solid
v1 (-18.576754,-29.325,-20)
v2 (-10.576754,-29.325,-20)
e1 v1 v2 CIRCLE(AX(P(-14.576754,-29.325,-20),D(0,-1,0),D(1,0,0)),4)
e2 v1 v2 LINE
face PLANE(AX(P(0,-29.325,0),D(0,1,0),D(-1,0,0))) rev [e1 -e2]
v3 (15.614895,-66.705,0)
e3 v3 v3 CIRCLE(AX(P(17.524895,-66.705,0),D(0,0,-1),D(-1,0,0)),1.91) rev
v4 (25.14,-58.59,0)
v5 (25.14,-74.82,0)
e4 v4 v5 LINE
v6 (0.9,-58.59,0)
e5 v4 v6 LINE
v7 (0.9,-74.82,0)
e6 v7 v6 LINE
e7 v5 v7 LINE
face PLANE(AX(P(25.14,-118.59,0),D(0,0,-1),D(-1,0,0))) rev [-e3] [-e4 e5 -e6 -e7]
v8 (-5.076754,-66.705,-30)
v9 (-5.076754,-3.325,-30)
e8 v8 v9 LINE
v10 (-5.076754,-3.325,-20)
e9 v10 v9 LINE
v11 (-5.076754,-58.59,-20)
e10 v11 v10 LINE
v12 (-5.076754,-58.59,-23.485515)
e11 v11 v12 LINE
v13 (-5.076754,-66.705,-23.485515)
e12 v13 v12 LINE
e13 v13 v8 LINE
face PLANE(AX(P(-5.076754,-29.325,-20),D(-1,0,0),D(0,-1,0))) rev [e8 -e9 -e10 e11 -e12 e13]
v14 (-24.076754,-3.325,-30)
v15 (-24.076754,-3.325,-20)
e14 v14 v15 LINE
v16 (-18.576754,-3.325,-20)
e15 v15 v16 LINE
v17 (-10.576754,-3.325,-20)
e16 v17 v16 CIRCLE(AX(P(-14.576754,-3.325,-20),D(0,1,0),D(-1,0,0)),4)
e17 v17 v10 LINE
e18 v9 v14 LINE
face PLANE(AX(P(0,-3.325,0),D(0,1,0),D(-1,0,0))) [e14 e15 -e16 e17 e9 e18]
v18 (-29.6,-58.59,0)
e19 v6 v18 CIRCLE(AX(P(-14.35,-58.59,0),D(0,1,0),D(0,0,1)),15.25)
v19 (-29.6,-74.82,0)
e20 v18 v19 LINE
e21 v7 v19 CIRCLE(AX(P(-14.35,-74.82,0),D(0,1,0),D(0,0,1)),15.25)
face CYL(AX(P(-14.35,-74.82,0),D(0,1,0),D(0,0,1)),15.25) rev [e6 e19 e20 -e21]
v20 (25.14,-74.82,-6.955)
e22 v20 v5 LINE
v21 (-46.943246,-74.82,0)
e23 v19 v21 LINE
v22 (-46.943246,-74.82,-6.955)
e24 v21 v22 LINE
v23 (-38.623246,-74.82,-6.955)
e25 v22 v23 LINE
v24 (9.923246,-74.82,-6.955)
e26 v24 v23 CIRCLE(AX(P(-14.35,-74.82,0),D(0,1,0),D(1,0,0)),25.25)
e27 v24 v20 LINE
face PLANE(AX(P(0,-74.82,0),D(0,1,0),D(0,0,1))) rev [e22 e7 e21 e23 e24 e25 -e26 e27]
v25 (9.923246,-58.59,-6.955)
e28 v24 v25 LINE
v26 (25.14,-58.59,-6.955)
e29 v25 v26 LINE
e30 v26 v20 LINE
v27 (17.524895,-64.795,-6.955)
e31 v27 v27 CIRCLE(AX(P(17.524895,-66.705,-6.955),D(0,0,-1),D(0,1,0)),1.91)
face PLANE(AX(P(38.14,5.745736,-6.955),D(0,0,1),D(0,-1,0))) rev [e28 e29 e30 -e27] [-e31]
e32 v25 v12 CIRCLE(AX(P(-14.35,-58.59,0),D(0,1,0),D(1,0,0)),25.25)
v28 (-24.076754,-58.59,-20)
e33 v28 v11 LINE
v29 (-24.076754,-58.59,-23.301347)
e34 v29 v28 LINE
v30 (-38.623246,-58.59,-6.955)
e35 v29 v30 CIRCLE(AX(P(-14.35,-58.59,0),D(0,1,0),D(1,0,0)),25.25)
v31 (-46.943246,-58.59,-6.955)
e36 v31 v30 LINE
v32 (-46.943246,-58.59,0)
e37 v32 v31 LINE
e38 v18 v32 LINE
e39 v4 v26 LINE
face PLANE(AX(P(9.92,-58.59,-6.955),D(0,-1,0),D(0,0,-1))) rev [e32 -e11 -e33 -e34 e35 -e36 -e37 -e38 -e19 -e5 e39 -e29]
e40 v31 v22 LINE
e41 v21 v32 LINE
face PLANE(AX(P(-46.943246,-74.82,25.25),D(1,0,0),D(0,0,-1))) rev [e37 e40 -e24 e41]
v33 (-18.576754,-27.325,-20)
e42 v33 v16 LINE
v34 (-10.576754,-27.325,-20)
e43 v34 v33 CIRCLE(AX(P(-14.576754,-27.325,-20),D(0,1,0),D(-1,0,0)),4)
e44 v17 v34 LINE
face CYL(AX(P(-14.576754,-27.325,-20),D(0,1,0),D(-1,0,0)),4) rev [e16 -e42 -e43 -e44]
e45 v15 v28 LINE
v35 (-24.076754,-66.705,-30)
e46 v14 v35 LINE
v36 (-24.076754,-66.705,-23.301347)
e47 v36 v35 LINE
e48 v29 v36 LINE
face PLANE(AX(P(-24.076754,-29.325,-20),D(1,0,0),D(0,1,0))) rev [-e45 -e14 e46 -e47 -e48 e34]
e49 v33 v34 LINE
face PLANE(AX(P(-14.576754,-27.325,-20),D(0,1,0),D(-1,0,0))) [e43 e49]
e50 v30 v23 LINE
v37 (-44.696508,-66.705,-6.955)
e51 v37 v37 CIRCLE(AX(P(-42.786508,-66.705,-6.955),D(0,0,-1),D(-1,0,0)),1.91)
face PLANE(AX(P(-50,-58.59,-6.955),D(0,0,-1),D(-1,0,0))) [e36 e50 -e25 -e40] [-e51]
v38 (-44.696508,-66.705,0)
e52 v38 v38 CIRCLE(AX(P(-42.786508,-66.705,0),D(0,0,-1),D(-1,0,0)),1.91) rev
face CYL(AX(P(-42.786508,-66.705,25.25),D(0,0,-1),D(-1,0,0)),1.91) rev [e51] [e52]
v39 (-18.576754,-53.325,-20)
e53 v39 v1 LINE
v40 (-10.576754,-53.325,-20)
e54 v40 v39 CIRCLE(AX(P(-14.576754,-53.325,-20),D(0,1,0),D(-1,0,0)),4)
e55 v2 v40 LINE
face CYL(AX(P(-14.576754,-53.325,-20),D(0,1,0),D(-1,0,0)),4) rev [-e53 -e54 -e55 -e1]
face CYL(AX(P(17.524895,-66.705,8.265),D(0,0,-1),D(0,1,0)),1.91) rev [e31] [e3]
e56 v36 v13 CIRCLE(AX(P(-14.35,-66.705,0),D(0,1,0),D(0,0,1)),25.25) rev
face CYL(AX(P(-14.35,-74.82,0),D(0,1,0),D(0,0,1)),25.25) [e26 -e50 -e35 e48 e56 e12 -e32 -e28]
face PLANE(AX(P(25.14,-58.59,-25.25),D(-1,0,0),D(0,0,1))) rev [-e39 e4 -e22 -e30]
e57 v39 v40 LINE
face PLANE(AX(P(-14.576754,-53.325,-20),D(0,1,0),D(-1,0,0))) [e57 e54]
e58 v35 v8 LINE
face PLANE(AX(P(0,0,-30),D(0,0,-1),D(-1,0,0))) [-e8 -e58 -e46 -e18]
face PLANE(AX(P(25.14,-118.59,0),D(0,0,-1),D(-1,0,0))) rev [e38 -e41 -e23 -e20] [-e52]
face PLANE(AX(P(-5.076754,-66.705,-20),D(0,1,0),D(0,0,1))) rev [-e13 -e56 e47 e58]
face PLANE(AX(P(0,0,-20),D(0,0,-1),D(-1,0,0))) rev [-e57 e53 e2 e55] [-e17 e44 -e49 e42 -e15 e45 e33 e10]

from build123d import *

# Parameters (mm, degrees)
SKETCH_1_W                = 50.28
SKETCH_1_H                = 34.2
SKETCH_1_W_2              = 30.28
SKETCH_1_H_2              = 14.2
EXTRUDE_1_DEPTH           = 12.25
SKETCH_4_W                = 13
SKETCH_4_H                = 13.91
EXTRUDE_1_2_DEPTH         = 74.82
SKETCH_5_W                = 13.91
SKETCH_5_H                = 16.23
EXTRUDE_2_DEPTH           = 16
SKETCH_7_R                = 25.25
SKETCH_7_R_2              = 15.25
EXTRUDE_2_2_DEPTH         = 16.23
SKETCH_15_R               = 1.91
CUT_EXTRUDE_6_DEPTH       = 97.964478439
SKETCH_18_W               = 49.344544624
SKETCH_18_H               = 6.125
CUT_EXTRUDE_8_DEPTH       = 101.789238284
SKETCH_19_W               = 34.2
SKETCH_19_H               = 6.125
CUT_EXTRUDE_9_DEPTH       = 10
SKETCH_21_R               = 1.91
CUT_EXTRUDE_10_DEPTH      = 10
SKETCH_20_R               = 1.91
CUT_EXTRUDE_11_DEPTH      = 10
FILLET_START              = -7.1
FILLET_1_DEPTH            = 14.2
FILLET_2_DEPTH            = 14.2
SKETCH_29_W               = 13.91
SKETCH_29_H               = 74.82
EXTRUDE_5_DEPTH           = 10
SKETCH_30_W               = 10
SKETCH_30_H               = 58.59
CUT_EXTRUDE_13_DEPTH      = 97.964478439
SKETCH_32_W               = 34.2
SKETCH_32_H               = 5.745736365
EXTRUDE_6_DEPTH           = 10
CUT_EXTRUDE_16_DEPTH      = 50
CUT_EXTRUDE_16_DEPTH_BACK = 50
SKETCH_38_W               = 116.985630298
SKETCH_38_H               = 80.538350638
SKETCH_41_W               = 13.91
SKETCH_41_H               = 5.745736365
EXTRUDE_7_DEPTH           = 3
SKETCH_42_W               = 13
SKETCH_42_H               = 13.91
EXTRUDE_8_DEPTH           = 74.82
SKETCH_43_W               = 13.91
SKETCH_43_H               = 16.23
EXTRUDE_9_DEPTH           = 15.22
SKETCH_44_R               = 1.91
CUT_EXTRUDE_17_DEPTH      = 15.22
SKETCH_46_R               = 25.25
SKETCH_46_R_2             = 15.25
EXTRUDE_6_2_DEPTH         = 16.23
EXTRUDE_10_DEPTH          = 7.22
EXTRUDE_10_DEPTH_BACK     = 10
SKETCH_47_W               = 13.91
SKETCH_47_H               = 16.23
SKETCH_50_W               = 3.056753925
SKETCH_50_H               = 16.23
CUT_EXTRUDE_18_DEPTH      = 96.578211037
SKETCH_51_R               = 1.91
CUT_EXTRUDE_19_DEPTH      = 95.015226304
CUT_EXTRUDE_21_DEPTH      = 95.015226304
CUT_EXTRUDE_21_DEPTH_BACK = 95.015226304
SKETCH_54_W               = 96.956660426
SKETCH_54_H               = 45.351296872
CUT_EXTRUDE_22_DEPTH      = 60
SKETCH_59_W               = 19
SKETCH_59_H               = 37.38
EXTRUDE_12_DEPTH          = 10
SKETCH_60_R               = 4
CUT_EXTRUDE_25_DEPTH      = 24
SKETCH_61_W               = 19
SKETCH_61_H               = 10
EXTRUDE_13_DEPTH          = 26
SKETCH_62_R               = 4
CUT_EXTRUDE_26_DEPTH      = 24


with BuildPart() as part:
    # 草圖1 → Extrude 1 (new body)
    with BuildSketch(Plane(origin=(0, 0, 0), x_dir=(1, 0, 0), z_dir=(0, 1, 0))):
        Rectangle(SKETCH_1_W, SKETCH_1_H)
        Rectangle(SKETCH_1_W_2, SKETCH_1_H_2, mode=Mode.SUBTRACT)
    extrude(amount=EXTRUDE_1_DEPTH)

    # 草圖4 → Extrude 1 2 (add)
    with BuildSketch(Plane.XZ):
        with Locations((18.64, 0)):
            Rectangle(SKETCH_4_W, SKETCH_4_H)
    extrude(amount=EXTRUDE_1_2_DEPTH)

    # 草圖5 → Extrude 2 (add)
    with BuildSketch(Plane.ZY.offset(-12.14)):
        with Locations((0, -66.705)):
            Rectangle(SKETCH_5_W, SKETCH_5_H)
    extrude(amount=EXTRUDE_2_DEPTH)

    # 草圖7 → Extrude 2 2 (add)
    with BuildSketch(Plane(origin=(3.626674765, -74.82, 0), x_dir=(1, 0, 0), z_dir=(0, -1, 0))):
        with Locations((-30.978154344, 0)):
            Circle(SKETCH_7_R)
        with Locations((-30.978154344, 0)):
            Circle(SKETCH_7_R_2, mode=Mode.SUBTRACT)
    extrude(amount=-EXTRUDE_2_2_DEPTH)

    # 草圖15 → 除料-伸長6 (cut, through all)
    with BuildSketch(Plane(origin=(0, 0, -6.955), x_dir=(-1, 0, 0), z_dir=(0, 0, -1))):
        with Locations((-4.530883248, -66.705)):
            Circle(SKETCH_15_R)
    extrude(amount=-CUT_EXTRUDE_6_DEPTH, mode=Mode.SUBTRACT)

    # 草圖18 → 除料-伸長8 (cut, through all)
    with BuildSketch(Plane(origin=(0, 0, -17.1), x_dir=(-1, 0, 0), z_dir=(0, 0, -1))):
        with Locations((0.467727688, 9.1875)):
            Rectangle(SKETCH_18_W, SKETCH_18_H)
    extrude(amount=-CUT_EXTRUDE_8_DEPTH, mode=Mode.SUBTRACT)

    # 草圖19 → 除料-伸長9 (cut)
    with BuildSketch(Plane.ZY.offset(-24.204544624)):
        with Locations((0, 9.1875)):
            Rectangle(SKETCH_19_W, SKETCH_19_H)
    extrude(amount=-CUT_EXTRUDE_9_DEPTH, mode=Mode.SUBTRACT)

    # 草圖21 → 除料-伸長10 (cut)
    with BuildSketch(Plane(origin=(0, 6.125, 0), x_dir=(1, 0, 0), z_dir=(0, 1, 0))):
        with Locations(Location((17.69, 0, 0), (0, 0, 270))):
            Circle(SKETCH_21_R)
    extrude(amount=-CUT_EXTRUDE_10_DEPTH, mode=Mode.SUBTRACT)

    # 草圖20 → 除料-伸長11 (cut)
    with BuildSketch(Plane(origin=(0, 6.125, 0), x_dir=(1, 0, 0), z_dir=(0, 1, 0))):
        with Locations(Location((-17.395, 0, 0), (0, 0, 270))):
            Circle(SKETCH_20_R)
    extrude(amount=-CUT_EXTRUDE_11_DEPTH, mode=Mode.SUBTRACT)

    # 圓角1: read off the stored shape, not the designer's step
    # 圓角1 outline → 圓角1 (cut)
    with BuildSketch(Plane.XY.offset(FILLET_START)):
        with BuildLine():
            add(Edge.make_bspline(
                [(-15.14, 0), (-21.974170252, 5.199829476), (-25.14, 5.745736365)],
                knots=[0, 0, 0, 0.664102345, 0.664102345, 0.664102345], degree=2, weights=[1, 2.223777218, 1.822127795]))
            Line((-15.14, 0), (-15.14, 6.125))
            Line((-15.14, 6.125), (-25.14, 6.125))
            Line((-25.14, 6.125), (-25.14, 5.745736365))
        make_face()
    extrude(amount=FILLET_1_DEPTH, mode=Mode.SUBTRACT)

    # 圓角2: read off the stored shape, not the designer's step
    # 圓角2 outline → 圓角2 (cut)
    with BuildSketch(Plane.XY.offset(FILLET_START)):
        with BuildLine():
            Line((15.14, 6.125), (15.14, 0))
            add(Edge.make_bspline(
                [(15.14, 0), (21.974170252, 5.199829476), (25.14, 5.745736365)],
                knots=[0, 0, 0, 0.664102345, 0.664102345, 0.664102345], degree=2, weights=[1, 2.223777218, 1.822127795]))
            Line((25.14, 5.745736365), (25.14, 6.125))
            Line((25.14, 6.125), (15.14, 6.125))
        make_face()
    extrude(amount=FILLET_2_DEPTH, mode=Mode.SUBTRACT)

    # 草圖29 → 填料-伸長5 (add)
    with BuildSketch(Plane(origin=(25.14, 0, 0), x_dir=(0, 0, -1), z_dir=(1, 0, 0))):
        with Locations((0, -37.41)):
            Rectangle(SKETCH_29_W, SKETCH_29_H)
    extrude(amount=EXTRUDE_5_DEPTH)

    # 草圖30 → 除料-伸長13 (cut, through all)
    with BuildSketch(Plane.XY.offset(6.955)):
        with Locations((17.14, -29.295)):
            Rectangle(SKETCH_30_W, SKETCH_30_H)
    extrude(amount=-CUT_EXTRUDE_13_DEPTH, mode=Mode.SUBTRACT)

    # 草圖32 → Extrude 6 (add)
    with BuildSketch(Plane(origin=(25.14, 0, 0), x_dir=(0, 0, -1), z_dir=(1, 0, 0))):
        with Locations((0, 2.872868182)):
            Rectangle(SKETCH_32_W, SKETCH_32_H)
    extrude(amount=EXTRUDE_6_DEPTH)

    # 草圖38 → 除料-伸長16 (cut, two sides: drawn at the far end of the back side and taken through both)
    with BuildSketch(Plane(origin=(0, 0, -6.955), x_dir=(-1, 0, 0), z_dir=(0, 0, -1)).offset(-CUT_EXTRUDE_16_DEPTH_BACK)):
        with Locations((7.268869252, -40.269175319)):
            Rectangle(SKETCH_38_W, SKETCH_38_H)
    extrude(amount=CUT_EXTRUDE_16_DEPTH + CUT_EXTRUDE_16_DEPTH_BACK, mode=Mode.SUBTRACT)

    # 草圖41 → 填料-伸長7 (add)
    with BuildSketch(Plane(origin=(35.14, 0, 0), x_dir=(0, 0, -1), z_dir=(1, 0, 0))):
        with Locations((0, 2.872868182)):
            Rectangle(SKETCH_41_W, SKETCH_41_H)
    extrude(amount=EXTRUDE_7_DEPTH)

    # 草圖42 → 填料-伸長8 (add)
    with BuildSketch(Plane(origin=(0, 0, 0), x_dir=(-1, 0, 0), z_dir=(0, -1, 0))):
        with Locations((-31.64, 0)):
            Rectangle(SKETCH_42_W, SKETCH_42_H)
    extrude(amount=EXTRUDE_8_DEPTH)

    # 草圖43 → 填料-伸長9 (add)
    with BuildSketch(Plane.ZY.offset(-25.14)):
        with Locations((0, -66.705)):
            Rectangle(SKETCH_43_W, SKETCH_43_H)
    extrude(amount=EXTRUDE_9_DEPTH)

    # 草圖44 → 除料-伸長17 (cut)
    with BuildSketch(Plane(origin=(0, 0, -6.955), x_dir=(-1, 0, 0), z_dir=(0, 0, -1))):
        with Locations(Location((-17.524895264, -66.705, 0), (0, 0, 90))):
            Circle(SKETCH_44_R)
    extrude(amount=-CUT_EXTRUDE_17_DEPTH, mode=Mode.SUBTRACT)

    # 草圖46 → Extrude 6 2 (add)
    with BuildSketch(Plane(origin=(0, -58.59, 0), x_dir=(1, 0, 0), z_dir=(0, 1, 0))):
        with Locations((-14.35, 0)):
            Circle(SKETCH_46_R)
        with Locations((-14.35, 0)):
            Circle(SKETCH_46_R_2, mode=Mode.SUBTRACT)
    extrude(amount=-EXTRUDE_6_2_DEPTH)

    # 草圖47 → 填料-伸長10 (add, two sides: drawn at the far end of the back side and taken through both)
    with BuildSketch(Plane(origin=(-40, 0, 0), x_dir=(0, 0, -1), z_dir=(1, 0, 0)).offset(-EXTRUDE_10_DEPTH_BACK)):
        with Locations((0, -66.705)):
            Rectangle(SKETCH_47_W, SKETCH_47_H)
    extrude(amount=EXTRUDE_10_DEPTH + EXTRUDE_10_DEPTH_BACK)

    # 草圖50 → 除料-伸長18 (cut, through all)
    with BuildSketch(Plane(origin=(0, 0, -6.955), x_dir=(-1, 0, 0), z_dir=(0, 0, -1))):
        with Locations((48.471623038, -66.705)):
            Rectangle(SKETCH_50_W, SKETCH_50_H)
    extrude(amount=-CUT_EXTRUDE_18_DEPTH, mode=Mode.SUBTRACT)

    # 草圖51 → 除料-伸長19 (cut, through all)
    with BuildSketch(Plane(origin=(0, 0, -6.955), x_dir=(-1, 0, 0), z_dir=(0, 0, -1))):
        with Locations((42.786508152, -66.705)):
            Circle(SKETCH_51_R)
    extrude(amount=-CUT_EXTRUDE_19_DEPTH, mode=Mode.SUBTRACT)

    # 草圖53 → 除料-伸長21 (cut, two sides: drawn at the far end of the back side and taken through both)
    with BuildSketch(Plane.XY.offset(6.955).offset(-CUT_EXTRUDE_21_DEPTH_BACK)):
        Polygon((25.14, -58.59), (25.14, -81.637244924), (42.795360098, -81.637244924), (56.21630317, 11.638309425), (-41.644740061, 8.95412081), (-39.519757408, -16.545671026), (25.14, -20.795636332), align=None)
    extrude(amount=CUT_EXTRUDE_21_DEPTH + CUT_EXTRUDE_21_DEPTH_BACK, mode=Mode.SUBTRACT)

    # 草圖54 → 除料-伸長22 (cut)
    with BuildSketch(Plane(origin=(0, -58.59, 0), x_dir=(1, 0, 0), z_dir=(0, 1, 0))):
        with Locations((-23.338330213, -22.675648436)):
            Rectangle(SKETCH_54_W, SKETCH_54_H)
    extrude(amount=-CUT_EXTRUDE_22_DEPTH, mode=Mode.SUBTRACT)

    # 草圖59 → 填料-伸長12 (add)
    with BuildSketch(Plane.XY.offset(-30)):
        with Locations((-14.576753925, -48.015)):
            Rectangle(SKETCH_59_W, SKETCH_59_H)
    extrude(amount=EXTRUDE_12_DEPTH)

    # 草圖60 → 除料-伸長25 (cut)
    with BuildSketch(Plane(origin=(0, -29.325, 0), x_dir=(1, 0, 0), z_dir=(0, 1, 0))):
        with Locations((-14.576753925, 20)):
            Circle(SKETCH_60_R)
    extrude(amount=-CUT_EXTRUDE_25_DEPTH, mode=Mode.SUBTRACT)

    # 草圖61 → 填料-伸長13 (add)
    with BuildSketch(Plane(origin=(0, -29.325, 0), x_dir=(1, 0, 0), z_dir=(0, 1, 0))):
        with Locations((-14.576753925, 25)):
            Rectangle(SKETCH_61_W, SKETCH_61_H)
    extrude(amount=EXTRUDE_13_DEPTH)

    # 草圖62 → 除料-伸長26 (cut)
    with BuildSketch(Plane(origin=(0, -3.325, 0), x_dir=(1, 0, 0), z_dir=(0, 1, 0))):
        with Locations((-14.576753925, 20)):
            Circle(SKETCH_62_R)
    extrude(amount=-CUT_EXTRUDE_26_DEPTH, mode=Mode.SUBTRACT)


solid = part.part
